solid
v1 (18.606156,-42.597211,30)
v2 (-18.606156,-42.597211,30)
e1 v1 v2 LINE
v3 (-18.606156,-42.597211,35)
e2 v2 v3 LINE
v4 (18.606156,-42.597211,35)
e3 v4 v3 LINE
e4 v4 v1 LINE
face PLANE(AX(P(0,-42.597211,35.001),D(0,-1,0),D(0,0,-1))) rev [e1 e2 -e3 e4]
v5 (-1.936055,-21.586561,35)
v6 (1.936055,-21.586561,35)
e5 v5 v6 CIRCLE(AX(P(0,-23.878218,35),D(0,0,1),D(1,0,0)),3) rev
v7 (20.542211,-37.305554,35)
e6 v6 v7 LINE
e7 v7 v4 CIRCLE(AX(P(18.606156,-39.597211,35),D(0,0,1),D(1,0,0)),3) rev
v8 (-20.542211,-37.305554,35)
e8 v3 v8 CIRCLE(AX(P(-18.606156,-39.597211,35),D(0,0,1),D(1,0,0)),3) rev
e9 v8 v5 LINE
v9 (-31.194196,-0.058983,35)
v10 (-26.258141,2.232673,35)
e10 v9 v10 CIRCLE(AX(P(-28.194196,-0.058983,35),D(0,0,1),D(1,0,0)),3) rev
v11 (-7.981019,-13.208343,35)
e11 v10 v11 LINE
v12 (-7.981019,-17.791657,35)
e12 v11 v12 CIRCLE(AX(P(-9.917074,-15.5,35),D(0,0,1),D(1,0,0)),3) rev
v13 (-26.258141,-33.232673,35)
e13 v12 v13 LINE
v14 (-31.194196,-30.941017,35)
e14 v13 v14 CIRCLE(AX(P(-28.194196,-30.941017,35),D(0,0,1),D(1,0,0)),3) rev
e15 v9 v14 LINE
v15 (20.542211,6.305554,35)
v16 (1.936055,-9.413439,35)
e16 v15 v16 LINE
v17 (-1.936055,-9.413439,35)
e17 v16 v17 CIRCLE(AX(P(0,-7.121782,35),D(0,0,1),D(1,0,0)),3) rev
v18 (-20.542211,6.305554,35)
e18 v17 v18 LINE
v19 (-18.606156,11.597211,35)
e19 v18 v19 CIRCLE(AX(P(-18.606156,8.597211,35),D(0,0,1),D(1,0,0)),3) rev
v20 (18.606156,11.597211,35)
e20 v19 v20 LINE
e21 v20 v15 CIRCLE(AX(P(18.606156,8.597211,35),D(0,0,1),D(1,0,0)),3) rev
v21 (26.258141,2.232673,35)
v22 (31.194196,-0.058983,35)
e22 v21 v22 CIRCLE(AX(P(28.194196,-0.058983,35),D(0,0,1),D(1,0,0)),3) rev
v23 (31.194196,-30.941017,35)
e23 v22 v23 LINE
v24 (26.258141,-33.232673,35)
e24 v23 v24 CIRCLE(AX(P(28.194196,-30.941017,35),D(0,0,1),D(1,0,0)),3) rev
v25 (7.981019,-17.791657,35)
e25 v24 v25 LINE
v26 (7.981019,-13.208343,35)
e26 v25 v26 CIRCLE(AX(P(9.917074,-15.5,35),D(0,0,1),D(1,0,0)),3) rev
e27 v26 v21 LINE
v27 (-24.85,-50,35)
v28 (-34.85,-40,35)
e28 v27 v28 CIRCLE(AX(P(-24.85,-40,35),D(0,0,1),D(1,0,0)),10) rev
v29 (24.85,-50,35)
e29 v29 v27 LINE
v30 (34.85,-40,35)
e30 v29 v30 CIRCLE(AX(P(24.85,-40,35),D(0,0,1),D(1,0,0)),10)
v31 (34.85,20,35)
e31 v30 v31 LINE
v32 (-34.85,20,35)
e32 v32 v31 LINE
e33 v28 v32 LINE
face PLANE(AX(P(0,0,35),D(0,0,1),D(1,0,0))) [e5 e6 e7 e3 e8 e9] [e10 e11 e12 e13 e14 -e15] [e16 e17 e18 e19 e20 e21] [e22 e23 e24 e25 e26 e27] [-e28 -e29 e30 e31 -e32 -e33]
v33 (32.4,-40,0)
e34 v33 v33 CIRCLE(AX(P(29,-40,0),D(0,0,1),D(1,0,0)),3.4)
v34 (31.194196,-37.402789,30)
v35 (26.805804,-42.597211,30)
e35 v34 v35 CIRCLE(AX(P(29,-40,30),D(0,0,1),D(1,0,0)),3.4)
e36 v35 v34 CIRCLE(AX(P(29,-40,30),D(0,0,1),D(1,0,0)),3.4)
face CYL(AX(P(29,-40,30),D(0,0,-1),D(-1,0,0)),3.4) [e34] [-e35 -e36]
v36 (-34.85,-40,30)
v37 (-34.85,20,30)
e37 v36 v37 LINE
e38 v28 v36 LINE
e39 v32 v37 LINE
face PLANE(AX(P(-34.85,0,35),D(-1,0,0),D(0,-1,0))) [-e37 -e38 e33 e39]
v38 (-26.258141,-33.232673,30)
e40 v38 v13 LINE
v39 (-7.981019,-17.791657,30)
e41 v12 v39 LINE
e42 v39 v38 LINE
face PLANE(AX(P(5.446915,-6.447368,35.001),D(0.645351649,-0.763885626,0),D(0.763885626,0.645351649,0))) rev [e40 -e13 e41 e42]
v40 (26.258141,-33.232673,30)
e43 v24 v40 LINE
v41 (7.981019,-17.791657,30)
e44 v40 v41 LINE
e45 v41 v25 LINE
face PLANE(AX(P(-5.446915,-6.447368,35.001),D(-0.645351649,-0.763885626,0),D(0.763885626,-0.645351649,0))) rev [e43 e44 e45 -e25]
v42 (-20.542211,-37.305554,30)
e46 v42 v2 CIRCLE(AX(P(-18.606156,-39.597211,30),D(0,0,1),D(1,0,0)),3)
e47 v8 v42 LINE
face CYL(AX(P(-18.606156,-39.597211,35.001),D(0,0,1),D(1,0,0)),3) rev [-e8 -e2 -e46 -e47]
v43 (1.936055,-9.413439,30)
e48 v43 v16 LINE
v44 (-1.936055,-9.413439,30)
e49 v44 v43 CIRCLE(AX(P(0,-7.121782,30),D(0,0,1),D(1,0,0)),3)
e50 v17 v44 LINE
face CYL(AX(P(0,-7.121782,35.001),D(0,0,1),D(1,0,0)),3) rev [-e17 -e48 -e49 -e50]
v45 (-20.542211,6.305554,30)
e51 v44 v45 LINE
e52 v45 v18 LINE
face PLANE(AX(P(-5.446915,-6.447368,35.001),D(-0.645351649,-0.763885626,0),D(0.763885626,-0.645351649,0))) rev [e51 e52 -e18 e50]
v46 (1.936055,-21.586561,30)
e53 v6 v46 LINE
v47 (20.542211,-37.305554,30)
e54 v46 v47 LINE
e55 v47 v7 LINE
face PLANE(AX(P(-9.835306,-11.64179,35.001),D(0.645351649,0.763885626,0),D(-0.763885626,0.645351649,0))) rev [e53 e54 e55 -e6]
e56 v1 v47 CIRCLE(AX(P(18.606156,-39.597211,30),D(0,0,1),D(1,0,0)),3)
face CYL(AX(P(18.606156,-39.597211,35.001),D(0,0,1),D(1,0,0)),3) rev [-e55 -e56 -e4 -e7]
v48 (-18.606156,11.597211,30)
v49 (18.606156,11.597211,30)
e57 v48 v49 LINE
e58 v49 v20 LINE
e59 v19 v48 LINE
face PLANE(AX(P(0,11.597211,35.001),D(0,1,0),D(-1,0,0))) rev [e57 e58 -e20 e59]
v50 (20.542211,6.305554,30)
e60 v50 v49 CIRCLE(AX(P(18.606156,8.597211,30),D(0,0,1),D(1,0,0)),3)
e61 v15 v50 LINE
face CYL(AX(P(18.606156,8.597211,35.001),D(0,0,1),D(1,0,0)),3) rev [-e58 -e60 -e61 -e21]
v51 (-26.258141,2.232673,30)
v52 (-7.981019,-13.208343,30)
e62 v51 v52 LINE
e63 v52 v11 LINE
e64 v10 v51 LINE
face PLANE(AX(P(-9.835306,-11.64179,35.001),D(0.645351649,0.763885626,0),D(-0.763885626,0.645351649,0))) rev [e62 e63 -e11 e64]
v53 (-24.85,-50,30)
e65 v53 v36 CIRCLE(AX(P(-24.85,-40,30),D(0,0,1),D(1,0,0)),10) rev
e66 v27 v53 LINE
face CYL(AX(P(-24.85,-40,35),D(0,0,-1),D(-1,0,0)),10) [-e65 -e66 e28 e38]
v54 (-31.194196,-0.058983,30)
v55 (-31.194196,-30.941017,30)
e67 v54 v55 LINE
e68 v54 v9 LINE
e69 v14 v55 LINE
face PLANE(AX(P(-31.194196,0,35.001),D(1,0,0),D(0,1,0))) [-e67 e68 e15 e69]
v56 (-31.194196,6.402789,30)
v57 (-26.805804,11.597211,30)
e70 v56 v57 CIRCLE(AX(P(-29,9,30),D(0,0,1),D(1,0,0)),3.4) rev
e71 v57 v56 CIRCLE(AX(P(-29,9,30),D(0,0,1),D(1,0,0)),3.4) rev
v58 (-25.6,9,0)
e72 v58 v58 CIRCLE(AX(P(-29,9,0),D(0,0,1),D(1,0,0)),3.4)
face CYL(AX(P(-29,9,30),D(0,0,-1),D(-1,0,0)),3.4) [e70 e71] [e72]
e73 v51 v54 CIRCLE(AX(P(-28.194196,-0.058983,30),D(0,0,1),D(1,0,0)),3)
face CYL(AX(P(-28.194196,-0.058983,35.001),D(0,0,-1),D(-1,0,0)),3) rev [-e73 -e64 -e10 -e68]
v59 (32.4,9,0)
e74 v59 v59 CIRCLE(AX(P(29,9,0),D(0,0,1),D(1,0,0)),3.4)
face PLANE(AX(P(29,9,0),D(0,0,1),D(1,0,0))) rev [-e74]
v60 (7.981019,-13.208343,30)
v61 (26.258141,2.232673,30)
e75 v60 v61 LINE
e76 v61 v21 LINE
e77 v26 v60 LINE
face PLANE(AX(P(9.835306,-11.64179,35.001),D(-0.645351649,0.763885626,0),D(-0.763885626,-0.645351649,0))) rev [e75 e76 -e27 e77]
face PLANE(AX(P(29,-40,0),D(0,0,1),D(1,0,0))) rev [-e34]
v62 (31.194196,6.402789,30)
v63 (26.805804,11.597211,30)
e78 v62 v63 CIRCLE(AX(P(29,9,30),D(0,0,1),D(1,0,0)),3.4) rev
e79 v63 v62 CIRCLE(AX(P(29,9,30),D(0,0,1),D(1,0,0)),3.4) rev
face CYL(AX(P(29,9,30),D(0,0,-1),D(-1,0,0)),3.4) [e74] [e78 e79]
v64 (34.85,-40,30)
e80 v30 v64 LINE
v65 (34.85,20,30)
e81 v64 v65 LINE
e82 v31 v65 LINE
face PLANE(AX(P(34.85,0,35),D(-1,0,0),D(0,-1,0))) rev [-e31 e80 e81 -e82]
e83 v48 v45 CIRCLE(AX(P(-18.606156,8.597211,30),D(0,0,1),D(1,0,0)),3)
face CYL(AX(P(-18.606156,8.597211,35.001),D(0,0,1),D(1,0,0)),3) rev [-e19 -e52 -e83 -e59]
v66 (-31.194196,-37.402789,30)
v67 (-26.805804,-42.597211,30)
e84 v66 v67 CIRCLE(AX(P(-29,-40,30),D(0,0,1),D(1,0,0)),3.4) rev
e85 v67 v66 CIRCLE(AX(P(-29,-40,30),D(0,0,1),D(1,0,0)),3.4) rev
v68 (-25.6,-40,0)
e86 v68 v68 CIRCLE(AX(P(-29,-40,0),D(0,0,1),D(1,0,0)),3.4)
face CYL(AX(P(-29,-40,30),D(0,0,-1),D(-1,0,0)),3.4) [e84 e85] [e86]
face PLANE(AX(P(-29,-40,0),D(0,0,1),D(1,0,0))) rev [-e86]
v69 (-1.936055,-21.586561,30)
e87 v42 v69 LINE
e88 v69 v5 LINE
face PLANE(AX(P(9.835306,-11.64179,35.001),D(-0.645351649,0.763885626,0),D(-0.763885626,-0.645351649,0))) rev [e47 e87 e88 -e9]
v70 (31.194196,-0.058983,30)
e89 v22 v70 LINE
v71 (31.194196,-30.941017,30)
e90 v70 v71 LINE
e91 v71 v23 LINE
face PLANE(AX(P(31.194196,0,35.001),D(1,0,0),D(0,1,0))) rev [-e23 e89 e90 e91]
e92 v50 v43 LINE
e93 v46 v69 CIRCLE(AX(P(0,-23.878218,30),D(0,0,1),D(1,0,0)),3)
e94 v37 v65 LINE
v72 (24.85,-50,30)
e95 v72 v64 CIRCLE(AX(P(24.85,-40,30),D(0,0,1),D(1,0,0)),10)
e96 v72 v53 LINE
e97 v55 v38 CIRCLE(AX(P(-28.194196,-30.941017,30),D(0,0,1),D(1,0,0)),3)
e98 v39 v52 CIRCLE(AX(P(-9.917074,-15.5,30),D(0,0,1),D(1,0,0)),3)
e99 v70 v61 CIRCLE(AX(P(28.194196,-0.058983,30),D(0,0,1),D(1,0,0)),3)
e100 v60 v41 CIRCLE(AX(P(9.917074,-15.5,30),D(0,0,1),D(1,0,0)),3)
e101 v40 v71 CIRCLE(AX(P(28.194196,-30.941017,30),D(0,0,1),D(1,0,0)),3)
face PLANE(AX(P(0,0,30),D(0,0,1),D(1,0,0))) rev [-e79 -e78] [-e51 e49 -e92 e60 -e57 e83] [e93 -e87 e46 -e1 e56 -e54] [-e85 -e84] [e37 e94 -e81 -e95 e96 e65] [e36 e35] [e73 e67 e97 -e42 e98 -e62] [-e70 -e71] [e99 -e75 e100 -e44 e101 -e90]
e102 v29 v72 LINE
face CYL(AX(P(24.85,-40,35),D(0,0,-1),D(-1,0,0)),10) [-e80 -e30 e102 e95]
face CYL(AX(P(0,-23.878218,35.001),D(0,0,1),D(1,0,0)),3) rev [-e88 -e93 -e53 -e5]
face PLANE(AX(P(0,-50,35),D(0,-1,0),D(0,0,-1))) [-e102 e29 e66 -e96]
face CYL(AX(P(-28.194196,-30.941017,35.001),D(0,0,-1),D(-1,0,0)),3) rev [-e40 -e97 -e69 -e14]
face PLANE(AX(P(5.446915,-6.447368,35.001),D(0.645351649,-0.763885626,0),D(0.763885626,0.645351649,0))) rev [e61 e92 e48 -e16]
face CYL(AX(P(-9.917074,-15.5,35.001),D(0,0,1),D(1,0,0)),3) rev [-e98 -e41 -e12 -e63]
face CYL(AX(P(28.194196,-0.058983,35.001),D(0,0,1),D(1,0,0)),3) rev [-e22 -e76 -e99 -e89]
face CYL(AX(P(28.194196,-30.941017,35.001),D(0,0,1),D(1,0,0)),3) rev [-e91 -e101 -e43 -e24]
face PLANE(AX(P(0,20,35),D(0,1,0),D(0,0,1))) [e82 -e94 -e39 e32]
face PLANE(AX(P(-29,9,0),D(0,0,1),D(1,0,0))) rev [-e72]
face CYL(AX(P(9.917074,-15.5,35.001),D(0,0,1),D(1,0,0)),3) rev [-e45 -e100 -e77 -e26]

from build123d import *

# Parameters (mm, degrees)
SKETCH1_R             = 3.4
BOSS_EXTRUDE1_DEPTH   = 30
BOSS_EXTRUDE1_2_DEPTH = 30
BOSS_EXTRUDE1_3_DEPTH = 30
BOSS_EXTRUDE1_4_DEPTH = 30
BOSS_EXTRUDE2_DEPTH   = 5
CUT_EXTRUDE1_REACH    = 69.93
FILLET1_R             = 3


with BuildPart() as part:
    # Sketch1 → Boss-Extrude1 (new body)
    with BuildSketch(Plane.XY):
        with Locations((29, -40)):
            Circle(SKETCH1_R)
    extrude(amount=BOSS_EXTRUDE1_DEPTH)



with BuildPart() as body_2:
    # Sketch1 → Boss-Extrude1 2 (new body)
    with BuildSketch(Plane.XY):
        with Locations((-29, -40)):
            Circle(SKETCH1_R)
    extrude(amount=BOSS_EXTRUDE1_2_DEPTH)


with BuildPart() as body_3:
    # Sketch1 → Boss-Extrude1 3 (new body)
    with BuildSketch(Plane.XY):
        with Locations((-29, 9)):
            Circle(SKETCH1_R)
    extrude(amount=BOSS_EXTRUDE1_3_DEPTH)


with BuildPart() as body_4:
    # Sketch1 → Boss-Extrude1 4 (new body)
    with BuildSketch(Plane.XY):
        with Locations((29, 9)):
            Circle(SKETCH1_R)
    extrude(amount=BOSS_EXTRUDE1_4_DEPTH)


with BuildPart() as part_1:
    add(part.part)

    add(body_2.part)  # Boss-Extrude2 merges body 2

    add(body_3.part)  # Boss-Extrude2 merges body 3

    add(body_4.part)  # Boss-Extrude2 merges body 4
    # Sketch2 → Boss-Extrude2 (add)
    with BuildSketch(Plane.XY.offset(30)):
        with BuildLine():
            Line((-24.85, -50), (24.85, -50))
            ThreePointArc((24.85, -50), (31.921067812, -47.071067812), (34.85, -40))
            Line((34.85, -40), (34.85, 20))
            Line((34.85, 20), (-34.85, 20))
            Line((-34.85, 20), (-34.85, -40))
            ThreePointArc((-34.85, -40), (-31.921067812, -47.071067812), (-24.85, -50))
        make_face()
    extrude(amount=BOSS_EXTRUDE2_DEPTH)

    # Sketch3 → Cut-Extrude1 (cut, up to next)
    with BuildSketch(Plane(origin=(0, 0, 30), x_dir=(-1, 0, 0), z_dir=(0, 0, -1)), mode=Mode.PRIVATE) as cut_extrude1_sk1:
        Polygon((-5.268445512, -15.5), (-31.194195607, 6.402788873), (-31.194195607, -37.402788873), align=None)
    cut_extrude1_tool1 = extrude(cut_extrude1_sk1.sketch, amount=-CUT_EXTRUDE1_REACH, mode=Mode.PRIVATE) & part_1.part
    # Sketch3 → Cut-Extrude1 (cut, up to next)
    with BuildSketch(Plane(origin=(0, 0, 30), x_dir=(-1, 0, 0), z_dir=(0, 0, -1)), mode=Mode.PRIVATE) as cut_extrude1_sk2:
        Polygon((26.805804393, 11.597211127), (-26.805804393, 11.597211127), (0, -11.049071895), align=None)
    cut_extrude1_tool2 = extrude(cut_extrude1_sk2.sketch, amount=-CUT_EXTRUDE1_REACH, mode=Mode.PRIVATE) & part_1.part
    # Sketch3 → Cut-Extrude1 (cut, up to next)
    with BuildSketch(Plane(origin=(0, 0, 30), x_dir=(-1, 0, 0), z_dir=(0, 0, -1)), mode=Mode.PRIVATE) as cut_extrude1_sk3:
        Polygon((31.194195607, 6.402788873), (5.268445512, -15.5), (31.194195607, -37.402788873), align=None)
    cut_extrude1_tool3 = extrude(cut_extrude1_sk3.sketch, amount=-CUT_EXTRUDE1_REACH, mode=Mode.PRIVATE) & part_1.part
    # Sketch3 → Cut-Extrude1 (cut, up to next)
    with BuildSketch(Plane(origin=(0, 0, 30), x_dir=(-1, 0, 0), z_dir=(0, 0, -1)), mode=Mode.PRIVATE) as cut_extrude1_sk4:
        Polygon((26.805804393, -42.597211127), (0, -19.950928105), (-26.805804393, -42.597211127), align=None)
    cut_extrude1_tool4 = extrude(cut_extrude1_sk4.sketch, amount=-CUT_EXTRUDE1_REACH, mode=Mode.PRIVATE) & part_1.part
    add(cut_extrude1_tool1.solids().sort_by_distance((22.552279, -15.5, 30))[0], mode=Mode.SUBTRACT)
    add(cut_extrude1_tool2.solids().sort_by_distance((0, 4.04845, 30))[0], mode=Mode.SUBTRACT)
    add(cut_extrude1_tool3.solids().sort_by_distance((-22.552279, -15.5, 30))[0], mode=Mode.SUBTRACT)
    add(cut_extrude1_tool4.solids().sort_by_distance((0, -35.04845, 30))[0], mode=Mode.SUBTRACT)

    # Fillet1
    # the kernel refuses this fillet: 3 mm, written as the material it adds along each edge
    with BuildSketch(Plane(origin=(-31.194195607, 6.402788873, 30), x_dir=(0, -1, 0), z_dir=(0, 0, 1)), Plane(origin=(31.194195607, -37.402788873, 30), x_dir=(0, 1, 0), z_dir=(0, 0, 1))) as fillet1_piece_1:
        with BuildLine():
            CenterArc((FILLET1_R * 2.15392408777, FILLET1_R), FILLET1_R, 139.807953963, 130.192046037)
            Line((FILLET1_R * 1.39003846223, FILLET1_R * 1.64535164917), (0, 0))
            Line((0, 0), (FILLET1_R * 2.15392408777, 0))
        make_face()
    extrude(amount=5)
    with BuildSketch(Plane(origin=(-31.194195607, -37.402788873, 30), x_dir=(0, 1, 0), z_dir=(0, 0, 1)), Plane(origin=(31.194195607, 6.402788873, 30), x_dir=(0, -1, 0), z_dir=(0, 0, 1))) as fillet1_piece_2:
        with BuildLine():
            CenterArc((FILLET1_R * 2.15392408777, -FILLET1_R), FILLET1_R, 90, 130.192046037)
            Line((FILLET1_R * 1.39003846223, -FILLET1_R * 1.64535164917), (0, 0))
            Line((0, 0), (FILLET1_R * 2.15392408777, 0))
        make_face()
    extrude(amount=5)
    with BuildSketch(Plane(origin=(-5.268445512, -15.5, 30), x_dir=(-0.7638856255460464, -0.6453516491682078, 0), z_dir=(0, 0, 1))) as fillet1_piece_3:
        with BuildLine():
            CenterArc((FILLET1_R * 1.18367346939, -FILLET1_R), FILLET1_R, 90, 99.615907926)
            Line((FILLET1_R * 0.197723772944, -FILLET1_R * 1.16704249783), (0, 0))
            Line((0, 0), (FILLET1_R * 1.18367346939, 0))
        make_face()
    extrude(amount=5)
    with BuildSketch(Plane(origin=(-26.805804393, 11.597211127, 30), x_dir=(1, 0, 0), z_dir=(0, 0, 1)), Plane(origin=(26.805804393, -42.597211127, 30), x_dir=(-1, 0, 0), z_dir=(0, 0, 1))) as fillet1_piece_4:
        with BuildLine():
            CenterArc((FILLET1_R * 2.73321626716, -FILLET1_R), FILLET1_R, 90, 139.807953963)
            Line((FILLET1_R * 2.08786461799, -FILLET1_R * 1.76388562555), (0, 0))
            Line((0, 0), (FILLET1_R * 2.73321626716, 0))
        make_face()
    extrude(amount=5)
    with BuildSketch(Plane(origin=(0, -11.049071895, 30), x_dir=(0.7638856255460464, 0.6453516491682076, 0), z_dir=(0, 0, 1))) as fillet1_piece_5:
        with BuildLine():
            CenterArc((FILLET1_R * 0.844827586207, FILLET1_R), FILLET1_R, 189.615907926, 80.384092074)
            Line((-FILLET1_R * 0.141122110237, FILLET1_R * 0.832957502168), (0, 0))
            Line((0, 0), (FILLET1_R * 0.844827586207, 0))
        make_face()
    extrude(amount=5)
    with BuildSketch(Plane(origin=(26.805804393, 11.597211127, 30), x_dir=(-1, 0, 0), z_dir=(0, 0, 1)), Plane(origin=(-26.805804393, -42.597211127, 30), x_dir=(1, 0, 0), z_dir=(0, 0, 1))) as fillet1_piece_6:
        with BuildLine():
            CenterArc((FILLET1_R * 2.73321626716, FILLET1_R), FILLET1_R, 130.192046037, 139.807953963)
            Line((FILLET1_R * 2.08786461799, FILLET1_R * 1.76388562555), (0, 0))
            Line((0, 0), (FILLET1_R * 2.73321626716, 0))
        make_face()
    extrude(amount=5)
    with BuildSketch(Plane(origin=(0, -19.950928105, 30), x_dir=(0.7638856255460446, -0.6453516491682099, 0), z_dir=(0, 0, 1))) as fillet1_piece_7:
        with BuildLine():
            CenterArc((FILLET1_R * 0.844827586207, -FILLET1_R), FILLET1_R, 90, 80.384092074)
            Line((-FILLET1_R * 0.141122110237, -FILLET1_R * 0.832957502168), (0, 0))
            Line((0, 0), (FILLET1_R * 0.844827586207, 0))
        make_face()
    extrude(amount=5)
    with BuildSketch(Plane(origin=(5.268445512, -15.5, 30), x_dir=(0.7638856255460458, -0.6453516491682085, 0), z_dir=(0, 0, 1))) as fillet1_piece_8:
        with BuildLine():
            CenterArc((FILLET1_R * 1.18367346939, FILLET1_R), FILLET1_R, 170.384092074, 99.615907926)
            Line((FILLET1_R * 0.197723772944, FILLET1_R * 1.16704249783), (0, 0))
            Line((0, 0), (FILLET1_R * 1.18367346939, 0))
        make_face()
    extrude(amount=5)


solid = part_1.part
